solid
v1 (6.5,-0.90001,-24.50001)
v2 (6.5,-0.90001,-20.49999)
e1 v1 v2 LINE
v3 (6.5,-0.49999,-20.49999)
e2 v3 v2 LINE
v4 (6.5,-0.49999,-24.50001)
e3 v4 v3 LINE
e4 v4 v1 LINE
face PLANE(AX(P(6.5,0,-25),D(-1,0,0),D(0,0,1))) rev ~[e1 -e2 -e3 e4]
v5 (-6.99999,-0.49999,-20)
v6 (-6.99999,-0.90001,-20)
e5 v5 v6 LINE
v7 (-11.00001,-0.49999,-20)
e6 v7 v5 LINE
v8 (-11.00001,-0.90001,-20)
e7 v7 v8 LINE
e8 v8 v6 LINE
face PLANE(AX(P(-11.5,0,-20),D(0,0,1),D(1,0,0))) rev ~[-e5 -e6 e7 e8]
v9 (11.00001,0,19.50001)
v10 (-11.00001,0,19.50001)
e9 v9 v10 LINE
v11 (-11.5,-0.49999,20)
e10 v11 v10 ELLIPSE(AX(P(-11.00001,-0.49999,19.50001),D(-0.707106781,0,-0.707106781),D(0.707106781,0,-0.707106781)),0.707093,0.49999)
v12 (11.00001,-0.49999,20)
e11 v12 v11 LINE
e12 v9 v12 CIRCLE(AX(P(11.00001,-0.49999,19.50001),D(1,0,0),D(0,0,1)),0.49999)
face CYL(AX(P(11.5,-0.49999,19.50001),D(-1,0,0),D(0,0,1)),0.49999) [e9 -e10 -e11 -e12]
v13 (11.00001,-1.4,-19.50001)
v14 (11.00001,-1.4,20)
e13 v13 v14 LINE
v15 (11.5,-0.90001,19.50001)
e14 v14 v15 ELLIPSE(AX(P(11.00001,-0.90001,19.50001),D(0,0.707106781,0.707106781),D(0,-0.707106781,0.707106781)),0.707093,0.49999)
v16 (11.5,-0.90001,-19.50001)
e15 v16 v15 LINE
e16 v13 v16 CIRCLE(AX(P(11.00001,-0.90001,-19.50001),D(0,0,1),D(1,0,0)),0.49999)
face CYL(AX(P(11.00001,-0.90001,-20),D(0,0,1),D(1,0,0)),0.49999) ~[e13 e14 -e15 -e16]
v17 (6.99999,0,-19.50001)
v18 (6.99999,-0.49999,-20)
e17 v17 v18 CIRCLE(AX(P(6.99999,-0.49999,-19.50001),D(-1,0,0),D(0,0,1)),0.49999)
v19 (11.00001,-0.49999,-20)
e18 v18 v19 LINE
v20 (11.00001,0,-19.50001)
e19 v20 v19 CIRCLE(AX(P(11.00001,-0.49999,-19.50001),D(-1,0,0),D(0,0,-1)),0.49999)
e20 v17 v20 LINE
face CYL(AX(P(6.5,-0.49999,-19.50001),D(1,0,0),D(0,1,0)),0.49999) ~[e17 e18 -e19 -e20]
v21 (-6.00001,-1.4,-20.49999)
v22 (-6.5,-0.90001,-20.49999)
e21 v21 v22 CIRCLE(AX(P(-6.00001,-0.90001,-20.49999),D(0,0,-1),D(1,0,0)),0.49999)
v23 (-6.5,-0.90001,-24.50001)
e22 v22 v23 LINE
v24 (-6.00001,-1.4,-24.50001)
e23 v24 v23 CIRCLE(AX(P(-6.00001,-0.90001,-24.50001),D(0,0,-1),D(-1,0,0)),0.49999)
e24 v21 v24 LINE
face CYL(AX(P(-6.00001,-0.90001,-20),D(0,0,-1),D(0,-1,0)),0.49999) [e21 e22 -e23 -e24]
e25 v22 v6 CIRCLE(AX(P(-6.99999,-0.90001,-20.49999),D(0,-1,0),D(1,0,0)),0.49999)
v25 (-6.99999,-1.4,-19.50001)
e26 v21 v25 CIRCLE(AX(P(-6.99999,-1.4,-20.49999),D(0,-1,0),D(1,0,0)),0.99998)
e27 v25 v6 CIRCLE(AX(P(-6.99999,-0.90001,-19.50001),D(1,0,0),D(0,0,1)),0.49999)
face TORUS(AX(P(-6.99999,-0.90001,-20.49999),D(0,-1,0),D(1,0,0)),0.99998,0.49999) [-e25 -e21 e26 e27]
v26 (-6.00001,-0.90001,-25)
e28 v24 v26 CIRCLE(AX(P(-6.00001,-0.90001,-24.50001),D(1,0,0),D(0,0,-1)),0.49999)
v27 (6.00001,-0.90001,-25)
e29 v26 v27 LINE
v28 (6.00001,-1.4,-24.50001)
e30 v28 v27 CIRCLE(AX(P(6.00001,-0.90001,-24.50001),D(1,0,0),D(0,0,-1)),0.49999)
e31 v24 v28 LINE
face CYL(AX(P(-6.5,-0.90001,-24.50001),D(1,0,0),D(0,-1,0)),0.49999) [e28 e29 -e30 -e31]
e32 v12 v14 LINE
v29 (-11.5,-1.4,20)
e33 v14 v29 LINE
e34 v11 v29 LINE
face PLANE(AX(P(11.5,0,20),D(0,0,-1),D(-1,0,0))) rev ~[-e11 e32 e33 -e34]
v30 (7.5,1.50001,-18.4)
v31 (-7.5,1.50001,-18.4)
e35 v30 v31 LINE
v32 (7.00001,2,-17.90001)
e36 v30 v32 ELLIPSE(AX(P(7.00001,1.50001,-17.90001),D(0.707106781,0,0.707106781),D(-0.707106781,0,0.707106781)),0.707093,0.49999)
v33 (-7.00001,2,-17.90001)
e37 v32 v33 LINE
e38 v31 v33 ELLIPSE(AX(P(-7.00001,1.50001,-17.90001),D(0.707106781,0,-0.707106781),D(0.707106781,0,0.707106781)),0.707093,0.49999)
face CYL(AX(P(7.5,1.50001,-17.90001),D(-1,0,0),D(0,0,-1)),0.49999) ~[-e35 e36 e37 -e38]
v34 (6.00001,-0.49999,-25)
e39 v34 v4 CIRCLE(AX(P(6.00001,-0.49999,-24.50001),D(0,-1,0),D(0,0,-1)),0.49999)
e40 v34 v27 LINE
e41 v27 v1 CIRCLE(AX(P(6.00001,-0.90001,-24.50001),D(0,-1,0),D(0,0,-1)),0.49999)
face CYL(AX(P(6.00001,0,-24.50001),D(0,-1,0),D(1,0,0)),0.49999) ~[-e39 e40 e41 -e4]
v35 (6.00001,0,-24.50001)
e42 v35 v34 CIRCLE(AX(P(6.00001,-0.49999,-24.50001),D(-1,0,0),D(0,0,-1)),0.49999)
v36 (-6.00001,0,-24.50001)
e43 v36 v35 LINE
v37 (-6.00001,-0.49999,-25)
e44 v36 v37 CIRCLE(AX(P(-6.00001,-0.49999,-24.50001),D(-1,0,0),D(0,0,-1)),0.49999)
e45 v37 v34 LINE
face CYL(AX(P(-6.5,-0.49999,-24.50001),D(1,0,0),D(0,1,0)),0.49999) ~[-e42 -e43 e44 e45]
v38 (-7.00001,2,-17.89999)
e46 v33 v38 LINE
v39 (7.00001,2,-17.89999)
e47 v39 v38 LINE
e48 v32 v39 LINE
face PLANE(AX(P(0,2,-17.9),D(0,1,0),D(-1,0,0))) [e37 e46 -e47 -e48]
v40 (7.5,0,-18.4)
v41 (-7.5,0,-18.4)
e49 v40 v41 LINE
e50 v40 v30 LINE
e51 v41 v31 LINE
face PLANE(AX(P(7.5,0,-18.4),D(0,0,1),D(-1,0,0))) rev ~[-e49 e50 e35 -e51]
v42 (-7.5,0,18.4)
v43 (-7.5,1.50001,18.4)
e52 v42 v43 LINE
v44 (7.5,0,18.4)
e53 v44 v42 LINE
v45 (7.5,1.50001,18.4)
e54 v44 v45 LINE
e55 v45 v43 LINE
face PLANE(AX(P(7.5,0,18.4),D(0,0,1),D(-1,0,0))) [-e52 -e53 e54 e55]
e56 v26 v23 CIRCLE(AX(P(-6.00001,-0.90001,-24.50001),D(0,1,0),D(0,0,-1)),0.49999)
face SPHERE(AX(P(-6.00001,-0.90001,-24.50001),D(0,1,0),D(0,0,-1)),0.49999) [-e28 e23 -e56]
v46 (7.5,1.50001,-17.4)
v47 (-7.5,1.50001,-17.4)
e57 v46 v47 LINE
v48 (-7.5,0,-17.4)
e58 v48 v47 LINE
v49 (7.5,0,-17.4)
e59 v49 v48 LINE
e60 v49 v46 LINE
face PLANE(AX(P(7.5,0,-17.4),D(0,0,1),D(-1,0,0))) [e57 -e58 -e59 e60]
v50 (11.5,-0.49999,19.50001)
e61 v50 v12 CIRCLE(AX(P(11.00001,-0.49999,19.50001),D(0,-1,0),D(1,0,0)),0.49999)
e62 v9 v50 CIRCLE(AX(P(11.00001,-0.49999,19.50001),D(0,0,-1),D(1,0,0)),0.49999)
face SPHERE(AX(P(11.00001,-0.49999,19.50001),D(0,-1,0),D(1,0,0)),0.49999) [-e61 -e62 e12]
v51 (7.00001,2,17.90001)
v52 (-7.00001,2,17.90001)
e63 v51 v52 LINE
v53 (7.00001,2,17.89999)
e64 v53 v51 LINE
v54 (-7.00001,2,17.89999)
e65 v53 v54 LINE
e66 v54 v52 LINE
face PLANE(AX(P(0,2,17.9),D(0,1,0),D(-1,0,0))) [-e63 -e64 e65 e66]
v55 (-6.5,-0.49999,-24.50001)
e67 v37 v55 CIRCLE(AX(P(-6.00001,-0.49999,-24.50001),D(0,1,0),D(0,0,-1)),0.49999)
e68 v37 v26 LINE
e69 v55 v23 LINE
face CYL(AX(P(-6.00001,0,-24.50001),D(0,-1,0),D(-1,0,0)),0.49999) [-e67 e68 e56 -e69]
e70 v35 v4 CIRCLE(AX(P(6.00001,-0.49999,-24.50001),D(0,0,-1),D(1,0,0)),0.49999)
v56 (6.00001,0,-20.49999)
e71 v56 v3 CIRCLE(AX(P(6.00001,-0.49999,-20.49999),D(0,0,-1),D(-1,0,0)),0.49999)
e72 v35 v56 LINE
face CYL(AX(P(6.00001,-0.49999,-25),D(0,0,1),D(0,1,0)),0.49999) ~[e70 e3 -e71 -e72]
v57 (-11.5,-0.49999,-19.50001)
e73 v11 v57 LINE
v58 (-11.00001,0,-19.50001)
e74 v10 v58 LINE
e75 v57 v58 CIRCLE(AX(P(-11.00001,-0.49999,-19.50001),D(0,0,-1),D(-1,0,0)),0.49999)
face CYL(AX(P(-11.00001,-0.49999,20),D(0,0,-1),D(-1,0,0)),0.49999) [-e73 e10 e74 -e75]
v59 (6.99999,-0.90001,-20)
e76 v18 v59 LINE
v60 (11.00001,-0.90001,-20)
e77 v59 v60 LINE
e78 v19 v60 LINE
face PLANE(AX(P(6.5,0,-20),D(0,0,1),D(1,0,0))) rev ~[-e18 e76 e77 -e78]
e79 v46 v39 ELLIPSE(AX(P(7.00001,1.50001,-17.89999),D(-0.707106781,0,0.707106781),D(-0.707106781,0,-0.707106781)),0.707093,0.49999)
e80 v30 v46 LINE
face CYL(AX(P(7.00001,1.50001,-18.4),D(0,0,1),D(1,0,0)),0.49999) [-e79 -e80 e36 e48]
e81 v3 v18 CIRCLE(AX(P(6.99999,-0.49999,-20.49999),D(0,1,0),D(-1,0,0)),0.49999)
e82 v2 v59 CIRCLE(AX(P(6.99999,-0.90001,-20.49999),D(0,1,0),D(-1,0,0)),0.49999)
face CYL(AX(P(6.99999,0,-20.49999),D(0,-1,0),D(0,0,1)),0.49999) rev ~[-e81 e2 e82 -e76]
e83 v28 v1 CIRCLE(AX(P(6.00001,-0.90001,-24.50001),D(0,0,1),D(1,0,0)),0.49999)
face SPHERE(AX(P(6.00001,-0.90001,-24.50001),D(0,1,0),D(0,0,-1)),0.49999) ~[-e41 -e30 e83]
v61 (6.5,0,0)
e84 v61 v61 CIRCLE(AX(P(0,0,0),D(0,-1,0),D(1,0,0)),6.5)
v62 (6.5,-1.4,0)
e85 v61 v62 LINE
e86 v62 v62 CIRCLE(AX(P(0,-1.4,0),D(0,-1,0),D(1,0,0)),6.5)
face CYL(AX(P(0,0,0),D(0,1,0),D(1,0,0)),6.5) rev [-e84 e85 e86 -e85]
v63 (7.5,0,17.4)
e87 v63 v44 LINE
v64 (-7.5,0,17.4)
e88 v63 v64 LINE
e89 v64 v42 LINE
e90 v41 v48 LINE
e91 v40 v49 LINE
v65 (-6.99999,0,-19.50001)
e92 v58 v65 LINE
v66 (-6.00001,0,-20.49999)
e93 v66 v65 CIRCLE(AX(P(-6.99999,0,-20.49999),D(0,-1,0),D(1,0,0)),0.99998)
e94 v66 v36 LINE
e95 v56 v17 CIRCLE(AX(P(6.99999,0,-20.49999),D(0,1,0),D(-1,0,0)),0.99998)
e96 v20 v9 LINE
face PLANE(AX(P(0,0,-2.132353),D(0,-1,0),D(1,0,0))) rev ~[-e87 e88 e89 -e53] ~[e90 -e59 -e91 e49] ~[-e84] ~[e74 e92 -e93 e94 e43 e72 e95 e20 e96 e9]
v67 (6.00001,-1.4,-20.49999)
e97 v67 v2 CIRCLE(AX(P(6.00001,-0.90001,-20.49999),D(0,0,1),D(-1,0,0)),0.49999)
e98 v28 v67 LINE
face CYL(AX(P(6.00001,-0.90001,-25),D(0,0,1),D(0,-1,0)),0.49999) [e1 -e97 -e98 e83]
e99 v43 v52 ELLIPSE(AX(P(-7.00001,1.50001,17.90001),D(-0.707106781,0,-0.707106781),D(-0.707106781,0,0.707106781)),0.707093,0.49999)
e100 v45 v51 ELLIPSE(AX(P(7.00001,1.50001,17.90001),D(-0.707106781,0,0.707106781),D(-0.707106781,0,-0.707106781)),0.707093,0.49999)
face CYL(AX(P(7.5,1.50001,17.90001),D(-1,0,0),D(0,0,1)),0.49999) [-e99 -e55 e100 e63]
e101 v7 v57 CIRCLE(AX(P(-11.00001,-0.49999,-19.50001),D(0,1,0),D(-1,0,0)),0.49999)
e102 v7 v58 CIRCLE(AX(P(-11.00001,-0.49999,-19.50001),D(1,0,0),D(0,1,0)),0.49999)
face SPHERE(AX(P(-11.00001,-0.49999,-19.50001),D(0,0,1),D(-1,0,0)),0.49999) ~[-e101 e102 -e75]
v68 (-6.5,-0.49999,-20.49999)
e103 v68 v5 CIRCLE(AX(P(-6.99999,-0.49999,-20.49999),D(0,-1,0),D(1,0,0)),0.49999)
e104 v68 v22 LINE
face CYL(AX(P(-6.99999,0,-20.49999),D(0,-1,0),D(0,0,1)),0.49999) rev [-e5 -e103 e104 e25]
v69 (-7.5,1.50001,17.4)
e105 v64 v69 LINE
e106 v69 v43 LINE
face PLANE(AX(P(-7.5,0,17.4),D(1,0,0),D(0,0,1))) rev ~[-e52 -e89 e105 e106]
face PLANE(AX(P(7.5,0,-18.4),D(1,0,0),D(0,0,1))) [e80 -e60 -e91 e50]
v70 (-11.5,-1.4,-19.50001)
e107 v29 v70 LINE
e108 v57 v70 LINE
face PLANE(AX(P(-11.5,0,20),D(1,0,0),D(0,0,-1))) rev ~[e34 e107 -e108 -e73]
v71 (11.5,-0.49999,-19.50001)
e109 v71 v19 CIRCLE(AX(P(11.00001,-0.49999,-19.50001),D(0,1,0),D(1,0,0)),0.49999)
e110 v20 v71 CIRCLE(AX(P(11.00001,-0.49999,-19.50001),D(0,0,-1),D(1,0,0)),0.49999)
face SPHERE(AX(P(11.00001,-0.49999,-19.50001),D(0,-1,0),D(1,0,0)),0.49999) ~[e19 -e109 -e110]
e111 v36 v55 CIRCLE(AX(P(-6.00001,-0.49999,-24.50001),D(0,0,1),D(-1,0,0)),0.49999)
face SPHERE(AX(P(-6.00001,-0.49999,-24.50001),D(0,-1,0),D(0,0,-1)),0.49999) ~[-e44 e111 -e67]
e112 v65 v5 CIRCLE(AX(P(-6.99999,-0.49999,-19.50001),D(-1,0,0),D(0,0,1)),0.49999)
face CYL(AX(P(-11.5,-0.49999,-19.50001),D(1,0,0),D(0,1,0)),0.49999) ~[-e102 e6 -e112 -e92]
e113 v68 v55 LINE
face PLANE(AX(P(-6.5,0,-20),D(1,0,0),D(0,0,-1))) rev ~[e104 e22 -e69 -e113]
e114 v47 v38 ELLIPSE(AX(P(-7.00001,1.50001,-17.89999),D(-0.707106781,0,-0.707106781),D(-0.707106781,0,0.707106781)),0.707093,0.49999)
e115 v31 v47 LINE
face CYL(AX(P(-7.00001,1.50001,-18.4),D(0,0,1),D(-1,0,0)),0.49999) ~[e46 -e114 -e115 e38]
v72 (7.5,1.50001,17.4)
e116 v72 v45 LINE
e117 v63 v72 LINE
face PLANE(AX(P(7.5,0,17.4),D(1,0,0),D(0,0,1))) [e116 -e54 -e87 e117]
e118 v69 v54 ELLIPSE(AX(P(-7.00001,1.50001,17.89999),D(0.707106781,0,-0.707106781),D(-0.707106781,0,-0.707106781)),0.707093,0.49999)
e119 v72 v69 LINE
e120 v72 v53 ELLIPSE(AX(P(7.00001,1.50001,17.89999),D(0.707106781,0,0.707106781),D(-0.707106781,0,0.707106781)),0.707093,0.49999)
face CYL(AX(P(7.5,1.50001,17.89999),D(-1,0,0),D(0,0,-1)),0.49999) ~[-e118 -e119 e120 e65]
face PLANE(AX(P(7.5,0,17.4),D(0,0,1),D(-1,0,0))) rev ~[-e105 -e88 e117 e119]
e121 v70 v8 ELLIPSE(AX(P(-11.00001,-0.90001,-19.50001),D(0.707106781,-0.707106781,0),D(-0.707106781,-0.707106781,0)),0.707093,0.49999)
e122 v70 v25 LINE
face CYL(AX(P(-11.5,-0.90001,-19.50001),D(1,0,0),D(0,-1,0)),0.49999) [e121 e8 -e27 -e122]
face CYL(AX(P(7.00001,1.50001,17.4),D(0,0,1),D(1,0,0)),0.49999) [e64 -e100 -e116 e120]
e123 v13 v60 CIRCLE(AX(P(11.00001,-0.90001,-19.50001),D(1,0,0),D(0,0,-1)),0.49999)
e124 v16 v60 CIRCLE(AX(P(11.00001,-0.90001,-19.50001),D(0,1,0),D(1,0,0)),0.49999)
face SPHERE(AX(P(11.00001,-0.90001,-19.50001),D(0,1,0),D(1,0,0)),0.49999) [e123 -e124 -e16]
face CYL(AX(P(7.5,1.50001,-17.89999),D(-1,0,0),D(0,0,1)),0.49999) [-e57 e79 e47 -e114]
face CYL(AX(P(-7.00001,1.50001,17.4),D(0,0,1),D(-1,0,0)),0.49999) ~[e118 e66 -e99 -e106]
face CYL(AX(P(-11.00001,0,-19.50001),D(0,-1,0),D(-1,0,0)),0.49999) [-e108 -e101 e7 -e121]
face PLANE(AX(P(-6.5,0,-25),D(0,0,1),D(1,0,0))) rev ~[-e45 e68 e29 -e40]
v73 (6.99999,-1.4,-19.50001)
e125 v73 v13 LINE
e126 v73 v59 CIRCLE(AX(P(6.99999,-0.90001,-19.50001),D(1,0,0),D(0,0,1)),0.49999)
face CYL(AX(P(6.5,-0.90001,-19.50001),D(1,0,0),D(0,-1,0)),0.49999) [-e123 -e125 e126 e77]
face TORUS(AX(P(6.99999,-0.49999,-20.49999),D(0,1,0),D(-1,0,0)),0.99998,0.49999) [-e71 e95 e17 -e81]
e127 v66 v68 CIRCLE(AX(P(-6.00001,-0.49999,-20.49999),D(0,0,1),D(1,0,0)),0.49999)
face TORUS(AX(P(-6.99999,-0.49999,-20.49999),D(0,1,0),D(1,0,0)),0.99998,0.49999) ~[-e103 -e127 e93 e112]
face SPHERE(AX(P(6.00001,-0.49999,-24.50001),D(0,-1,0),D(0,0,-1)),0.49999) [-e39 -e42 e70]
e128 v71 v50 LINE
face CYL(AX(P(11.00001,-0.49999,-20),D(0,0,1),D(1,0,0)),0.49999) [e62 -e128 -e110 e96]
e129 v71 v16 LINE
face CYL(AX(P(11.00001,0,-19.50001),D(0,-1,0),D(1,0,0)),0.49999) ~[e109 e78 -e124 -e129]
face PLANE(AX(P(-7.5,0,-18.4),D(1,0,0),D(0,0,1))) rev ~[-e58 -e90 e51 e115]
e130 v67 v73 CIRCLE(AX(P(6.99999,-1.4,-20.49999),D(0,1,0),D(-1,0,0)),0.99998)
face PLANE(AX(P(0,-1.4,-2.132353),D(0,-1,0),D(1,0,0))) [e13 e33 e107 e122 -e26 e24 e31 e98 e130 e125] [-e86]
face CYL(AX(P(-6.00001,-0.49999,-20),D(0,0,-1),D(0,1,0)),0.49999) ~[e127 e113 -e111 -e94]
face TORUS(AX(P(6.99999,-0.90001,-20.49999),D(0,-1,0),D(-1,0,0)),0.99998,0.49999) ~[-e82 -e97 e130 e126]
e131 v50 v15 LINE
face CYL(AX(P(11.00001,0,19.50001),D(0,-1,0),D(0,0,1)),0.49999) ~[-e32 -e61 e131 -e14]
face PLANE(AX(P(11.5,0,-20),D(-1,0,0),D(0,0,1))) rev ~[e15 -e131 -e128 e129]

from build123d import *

# Parameters (mm, degrees)
F0_R     = 6.5
F1_DEPTH = 1.4
F2_W     = 15
F2_H     = 1
F3_DEPTH = 2
F4_R     = 0.49999


# Not quite as in the source:
# - a fillet or chamfer is up to 0.001 mm smaller than in the source, because OpenCascade refuses the exact size


with BuildPart() as f1:
    # F0 (on Front) → F1 (new body)
    with BuildSketch(Plane.XZ):
        Polygon((11.5, 20), (-11.5, 20), (-11.5, -20), (-6.5, -20), (-6.5, -25), (6.5, -25), (6.5, -20), (11.5, -20), align=None)
        Circle(F0_R, mode=Mode.SUBTRACT)
    extrude(amount=F1_DEPTH)

    # F2 (on face) → F3 (join)
    with BuildSketch(Plane(origin=(0, 0, 0), x_dir=(-1, 0, 0), z_dir=(0, 1, 0))):
        with Locations((0, 17.9)):
            Rectangle(F2_W, F2_H)
        with Locations((0, -17.9)):
            Rectangle(F2_W, F2_H)
    extrude(amount=F3_DEPTH)

    # F4 (radius 0.5 in the source; OpenCascade refuses exactly that, so slightly less here)
    f4_edges = [f1.edges().sort_by_distance(p)[0] for p in [
        (-6.5, -0.7, -25),
        (6.5, -0.7, -25),
        (0, 0, -25),
        (0, -1.4, -25),
        (6.5, -0.7, -20),
        (6.5, 0, -22.5),
        (6.5, -1.4, -22.5),
        (11.5, -0.7, -20),
        (11.5, -0.7, 20),
        (11.5, 0, 0),
        (11.5, -1.4, 0),
        (-11.5, 0, 0),
        (-6.5, -0.7, -20),
        (-6.5, 0, -22.5),
        (-6.5, -1.4, -22.5),
        (-11.5, -0.7, -20),
        (-9, 0, -20),
        (-9, -1.4, -20),
        (0, 0, 20),
        (0, 2, 17.4),
        (-7.5, 2, 17.9),
        (0, 2, 18.4),
        (7.5, 2, 17.9),
        (-7.5, 2, -17.9),
        (0, 2, -17.4),
        (7.5, 2, -17.9),
        (0, 2, -18.4),
        (9, 0, -20),
        (9, -1.4, -20),
    ]]
    fillet(f4_edges, radius=F4_R)


solid = f1.part
